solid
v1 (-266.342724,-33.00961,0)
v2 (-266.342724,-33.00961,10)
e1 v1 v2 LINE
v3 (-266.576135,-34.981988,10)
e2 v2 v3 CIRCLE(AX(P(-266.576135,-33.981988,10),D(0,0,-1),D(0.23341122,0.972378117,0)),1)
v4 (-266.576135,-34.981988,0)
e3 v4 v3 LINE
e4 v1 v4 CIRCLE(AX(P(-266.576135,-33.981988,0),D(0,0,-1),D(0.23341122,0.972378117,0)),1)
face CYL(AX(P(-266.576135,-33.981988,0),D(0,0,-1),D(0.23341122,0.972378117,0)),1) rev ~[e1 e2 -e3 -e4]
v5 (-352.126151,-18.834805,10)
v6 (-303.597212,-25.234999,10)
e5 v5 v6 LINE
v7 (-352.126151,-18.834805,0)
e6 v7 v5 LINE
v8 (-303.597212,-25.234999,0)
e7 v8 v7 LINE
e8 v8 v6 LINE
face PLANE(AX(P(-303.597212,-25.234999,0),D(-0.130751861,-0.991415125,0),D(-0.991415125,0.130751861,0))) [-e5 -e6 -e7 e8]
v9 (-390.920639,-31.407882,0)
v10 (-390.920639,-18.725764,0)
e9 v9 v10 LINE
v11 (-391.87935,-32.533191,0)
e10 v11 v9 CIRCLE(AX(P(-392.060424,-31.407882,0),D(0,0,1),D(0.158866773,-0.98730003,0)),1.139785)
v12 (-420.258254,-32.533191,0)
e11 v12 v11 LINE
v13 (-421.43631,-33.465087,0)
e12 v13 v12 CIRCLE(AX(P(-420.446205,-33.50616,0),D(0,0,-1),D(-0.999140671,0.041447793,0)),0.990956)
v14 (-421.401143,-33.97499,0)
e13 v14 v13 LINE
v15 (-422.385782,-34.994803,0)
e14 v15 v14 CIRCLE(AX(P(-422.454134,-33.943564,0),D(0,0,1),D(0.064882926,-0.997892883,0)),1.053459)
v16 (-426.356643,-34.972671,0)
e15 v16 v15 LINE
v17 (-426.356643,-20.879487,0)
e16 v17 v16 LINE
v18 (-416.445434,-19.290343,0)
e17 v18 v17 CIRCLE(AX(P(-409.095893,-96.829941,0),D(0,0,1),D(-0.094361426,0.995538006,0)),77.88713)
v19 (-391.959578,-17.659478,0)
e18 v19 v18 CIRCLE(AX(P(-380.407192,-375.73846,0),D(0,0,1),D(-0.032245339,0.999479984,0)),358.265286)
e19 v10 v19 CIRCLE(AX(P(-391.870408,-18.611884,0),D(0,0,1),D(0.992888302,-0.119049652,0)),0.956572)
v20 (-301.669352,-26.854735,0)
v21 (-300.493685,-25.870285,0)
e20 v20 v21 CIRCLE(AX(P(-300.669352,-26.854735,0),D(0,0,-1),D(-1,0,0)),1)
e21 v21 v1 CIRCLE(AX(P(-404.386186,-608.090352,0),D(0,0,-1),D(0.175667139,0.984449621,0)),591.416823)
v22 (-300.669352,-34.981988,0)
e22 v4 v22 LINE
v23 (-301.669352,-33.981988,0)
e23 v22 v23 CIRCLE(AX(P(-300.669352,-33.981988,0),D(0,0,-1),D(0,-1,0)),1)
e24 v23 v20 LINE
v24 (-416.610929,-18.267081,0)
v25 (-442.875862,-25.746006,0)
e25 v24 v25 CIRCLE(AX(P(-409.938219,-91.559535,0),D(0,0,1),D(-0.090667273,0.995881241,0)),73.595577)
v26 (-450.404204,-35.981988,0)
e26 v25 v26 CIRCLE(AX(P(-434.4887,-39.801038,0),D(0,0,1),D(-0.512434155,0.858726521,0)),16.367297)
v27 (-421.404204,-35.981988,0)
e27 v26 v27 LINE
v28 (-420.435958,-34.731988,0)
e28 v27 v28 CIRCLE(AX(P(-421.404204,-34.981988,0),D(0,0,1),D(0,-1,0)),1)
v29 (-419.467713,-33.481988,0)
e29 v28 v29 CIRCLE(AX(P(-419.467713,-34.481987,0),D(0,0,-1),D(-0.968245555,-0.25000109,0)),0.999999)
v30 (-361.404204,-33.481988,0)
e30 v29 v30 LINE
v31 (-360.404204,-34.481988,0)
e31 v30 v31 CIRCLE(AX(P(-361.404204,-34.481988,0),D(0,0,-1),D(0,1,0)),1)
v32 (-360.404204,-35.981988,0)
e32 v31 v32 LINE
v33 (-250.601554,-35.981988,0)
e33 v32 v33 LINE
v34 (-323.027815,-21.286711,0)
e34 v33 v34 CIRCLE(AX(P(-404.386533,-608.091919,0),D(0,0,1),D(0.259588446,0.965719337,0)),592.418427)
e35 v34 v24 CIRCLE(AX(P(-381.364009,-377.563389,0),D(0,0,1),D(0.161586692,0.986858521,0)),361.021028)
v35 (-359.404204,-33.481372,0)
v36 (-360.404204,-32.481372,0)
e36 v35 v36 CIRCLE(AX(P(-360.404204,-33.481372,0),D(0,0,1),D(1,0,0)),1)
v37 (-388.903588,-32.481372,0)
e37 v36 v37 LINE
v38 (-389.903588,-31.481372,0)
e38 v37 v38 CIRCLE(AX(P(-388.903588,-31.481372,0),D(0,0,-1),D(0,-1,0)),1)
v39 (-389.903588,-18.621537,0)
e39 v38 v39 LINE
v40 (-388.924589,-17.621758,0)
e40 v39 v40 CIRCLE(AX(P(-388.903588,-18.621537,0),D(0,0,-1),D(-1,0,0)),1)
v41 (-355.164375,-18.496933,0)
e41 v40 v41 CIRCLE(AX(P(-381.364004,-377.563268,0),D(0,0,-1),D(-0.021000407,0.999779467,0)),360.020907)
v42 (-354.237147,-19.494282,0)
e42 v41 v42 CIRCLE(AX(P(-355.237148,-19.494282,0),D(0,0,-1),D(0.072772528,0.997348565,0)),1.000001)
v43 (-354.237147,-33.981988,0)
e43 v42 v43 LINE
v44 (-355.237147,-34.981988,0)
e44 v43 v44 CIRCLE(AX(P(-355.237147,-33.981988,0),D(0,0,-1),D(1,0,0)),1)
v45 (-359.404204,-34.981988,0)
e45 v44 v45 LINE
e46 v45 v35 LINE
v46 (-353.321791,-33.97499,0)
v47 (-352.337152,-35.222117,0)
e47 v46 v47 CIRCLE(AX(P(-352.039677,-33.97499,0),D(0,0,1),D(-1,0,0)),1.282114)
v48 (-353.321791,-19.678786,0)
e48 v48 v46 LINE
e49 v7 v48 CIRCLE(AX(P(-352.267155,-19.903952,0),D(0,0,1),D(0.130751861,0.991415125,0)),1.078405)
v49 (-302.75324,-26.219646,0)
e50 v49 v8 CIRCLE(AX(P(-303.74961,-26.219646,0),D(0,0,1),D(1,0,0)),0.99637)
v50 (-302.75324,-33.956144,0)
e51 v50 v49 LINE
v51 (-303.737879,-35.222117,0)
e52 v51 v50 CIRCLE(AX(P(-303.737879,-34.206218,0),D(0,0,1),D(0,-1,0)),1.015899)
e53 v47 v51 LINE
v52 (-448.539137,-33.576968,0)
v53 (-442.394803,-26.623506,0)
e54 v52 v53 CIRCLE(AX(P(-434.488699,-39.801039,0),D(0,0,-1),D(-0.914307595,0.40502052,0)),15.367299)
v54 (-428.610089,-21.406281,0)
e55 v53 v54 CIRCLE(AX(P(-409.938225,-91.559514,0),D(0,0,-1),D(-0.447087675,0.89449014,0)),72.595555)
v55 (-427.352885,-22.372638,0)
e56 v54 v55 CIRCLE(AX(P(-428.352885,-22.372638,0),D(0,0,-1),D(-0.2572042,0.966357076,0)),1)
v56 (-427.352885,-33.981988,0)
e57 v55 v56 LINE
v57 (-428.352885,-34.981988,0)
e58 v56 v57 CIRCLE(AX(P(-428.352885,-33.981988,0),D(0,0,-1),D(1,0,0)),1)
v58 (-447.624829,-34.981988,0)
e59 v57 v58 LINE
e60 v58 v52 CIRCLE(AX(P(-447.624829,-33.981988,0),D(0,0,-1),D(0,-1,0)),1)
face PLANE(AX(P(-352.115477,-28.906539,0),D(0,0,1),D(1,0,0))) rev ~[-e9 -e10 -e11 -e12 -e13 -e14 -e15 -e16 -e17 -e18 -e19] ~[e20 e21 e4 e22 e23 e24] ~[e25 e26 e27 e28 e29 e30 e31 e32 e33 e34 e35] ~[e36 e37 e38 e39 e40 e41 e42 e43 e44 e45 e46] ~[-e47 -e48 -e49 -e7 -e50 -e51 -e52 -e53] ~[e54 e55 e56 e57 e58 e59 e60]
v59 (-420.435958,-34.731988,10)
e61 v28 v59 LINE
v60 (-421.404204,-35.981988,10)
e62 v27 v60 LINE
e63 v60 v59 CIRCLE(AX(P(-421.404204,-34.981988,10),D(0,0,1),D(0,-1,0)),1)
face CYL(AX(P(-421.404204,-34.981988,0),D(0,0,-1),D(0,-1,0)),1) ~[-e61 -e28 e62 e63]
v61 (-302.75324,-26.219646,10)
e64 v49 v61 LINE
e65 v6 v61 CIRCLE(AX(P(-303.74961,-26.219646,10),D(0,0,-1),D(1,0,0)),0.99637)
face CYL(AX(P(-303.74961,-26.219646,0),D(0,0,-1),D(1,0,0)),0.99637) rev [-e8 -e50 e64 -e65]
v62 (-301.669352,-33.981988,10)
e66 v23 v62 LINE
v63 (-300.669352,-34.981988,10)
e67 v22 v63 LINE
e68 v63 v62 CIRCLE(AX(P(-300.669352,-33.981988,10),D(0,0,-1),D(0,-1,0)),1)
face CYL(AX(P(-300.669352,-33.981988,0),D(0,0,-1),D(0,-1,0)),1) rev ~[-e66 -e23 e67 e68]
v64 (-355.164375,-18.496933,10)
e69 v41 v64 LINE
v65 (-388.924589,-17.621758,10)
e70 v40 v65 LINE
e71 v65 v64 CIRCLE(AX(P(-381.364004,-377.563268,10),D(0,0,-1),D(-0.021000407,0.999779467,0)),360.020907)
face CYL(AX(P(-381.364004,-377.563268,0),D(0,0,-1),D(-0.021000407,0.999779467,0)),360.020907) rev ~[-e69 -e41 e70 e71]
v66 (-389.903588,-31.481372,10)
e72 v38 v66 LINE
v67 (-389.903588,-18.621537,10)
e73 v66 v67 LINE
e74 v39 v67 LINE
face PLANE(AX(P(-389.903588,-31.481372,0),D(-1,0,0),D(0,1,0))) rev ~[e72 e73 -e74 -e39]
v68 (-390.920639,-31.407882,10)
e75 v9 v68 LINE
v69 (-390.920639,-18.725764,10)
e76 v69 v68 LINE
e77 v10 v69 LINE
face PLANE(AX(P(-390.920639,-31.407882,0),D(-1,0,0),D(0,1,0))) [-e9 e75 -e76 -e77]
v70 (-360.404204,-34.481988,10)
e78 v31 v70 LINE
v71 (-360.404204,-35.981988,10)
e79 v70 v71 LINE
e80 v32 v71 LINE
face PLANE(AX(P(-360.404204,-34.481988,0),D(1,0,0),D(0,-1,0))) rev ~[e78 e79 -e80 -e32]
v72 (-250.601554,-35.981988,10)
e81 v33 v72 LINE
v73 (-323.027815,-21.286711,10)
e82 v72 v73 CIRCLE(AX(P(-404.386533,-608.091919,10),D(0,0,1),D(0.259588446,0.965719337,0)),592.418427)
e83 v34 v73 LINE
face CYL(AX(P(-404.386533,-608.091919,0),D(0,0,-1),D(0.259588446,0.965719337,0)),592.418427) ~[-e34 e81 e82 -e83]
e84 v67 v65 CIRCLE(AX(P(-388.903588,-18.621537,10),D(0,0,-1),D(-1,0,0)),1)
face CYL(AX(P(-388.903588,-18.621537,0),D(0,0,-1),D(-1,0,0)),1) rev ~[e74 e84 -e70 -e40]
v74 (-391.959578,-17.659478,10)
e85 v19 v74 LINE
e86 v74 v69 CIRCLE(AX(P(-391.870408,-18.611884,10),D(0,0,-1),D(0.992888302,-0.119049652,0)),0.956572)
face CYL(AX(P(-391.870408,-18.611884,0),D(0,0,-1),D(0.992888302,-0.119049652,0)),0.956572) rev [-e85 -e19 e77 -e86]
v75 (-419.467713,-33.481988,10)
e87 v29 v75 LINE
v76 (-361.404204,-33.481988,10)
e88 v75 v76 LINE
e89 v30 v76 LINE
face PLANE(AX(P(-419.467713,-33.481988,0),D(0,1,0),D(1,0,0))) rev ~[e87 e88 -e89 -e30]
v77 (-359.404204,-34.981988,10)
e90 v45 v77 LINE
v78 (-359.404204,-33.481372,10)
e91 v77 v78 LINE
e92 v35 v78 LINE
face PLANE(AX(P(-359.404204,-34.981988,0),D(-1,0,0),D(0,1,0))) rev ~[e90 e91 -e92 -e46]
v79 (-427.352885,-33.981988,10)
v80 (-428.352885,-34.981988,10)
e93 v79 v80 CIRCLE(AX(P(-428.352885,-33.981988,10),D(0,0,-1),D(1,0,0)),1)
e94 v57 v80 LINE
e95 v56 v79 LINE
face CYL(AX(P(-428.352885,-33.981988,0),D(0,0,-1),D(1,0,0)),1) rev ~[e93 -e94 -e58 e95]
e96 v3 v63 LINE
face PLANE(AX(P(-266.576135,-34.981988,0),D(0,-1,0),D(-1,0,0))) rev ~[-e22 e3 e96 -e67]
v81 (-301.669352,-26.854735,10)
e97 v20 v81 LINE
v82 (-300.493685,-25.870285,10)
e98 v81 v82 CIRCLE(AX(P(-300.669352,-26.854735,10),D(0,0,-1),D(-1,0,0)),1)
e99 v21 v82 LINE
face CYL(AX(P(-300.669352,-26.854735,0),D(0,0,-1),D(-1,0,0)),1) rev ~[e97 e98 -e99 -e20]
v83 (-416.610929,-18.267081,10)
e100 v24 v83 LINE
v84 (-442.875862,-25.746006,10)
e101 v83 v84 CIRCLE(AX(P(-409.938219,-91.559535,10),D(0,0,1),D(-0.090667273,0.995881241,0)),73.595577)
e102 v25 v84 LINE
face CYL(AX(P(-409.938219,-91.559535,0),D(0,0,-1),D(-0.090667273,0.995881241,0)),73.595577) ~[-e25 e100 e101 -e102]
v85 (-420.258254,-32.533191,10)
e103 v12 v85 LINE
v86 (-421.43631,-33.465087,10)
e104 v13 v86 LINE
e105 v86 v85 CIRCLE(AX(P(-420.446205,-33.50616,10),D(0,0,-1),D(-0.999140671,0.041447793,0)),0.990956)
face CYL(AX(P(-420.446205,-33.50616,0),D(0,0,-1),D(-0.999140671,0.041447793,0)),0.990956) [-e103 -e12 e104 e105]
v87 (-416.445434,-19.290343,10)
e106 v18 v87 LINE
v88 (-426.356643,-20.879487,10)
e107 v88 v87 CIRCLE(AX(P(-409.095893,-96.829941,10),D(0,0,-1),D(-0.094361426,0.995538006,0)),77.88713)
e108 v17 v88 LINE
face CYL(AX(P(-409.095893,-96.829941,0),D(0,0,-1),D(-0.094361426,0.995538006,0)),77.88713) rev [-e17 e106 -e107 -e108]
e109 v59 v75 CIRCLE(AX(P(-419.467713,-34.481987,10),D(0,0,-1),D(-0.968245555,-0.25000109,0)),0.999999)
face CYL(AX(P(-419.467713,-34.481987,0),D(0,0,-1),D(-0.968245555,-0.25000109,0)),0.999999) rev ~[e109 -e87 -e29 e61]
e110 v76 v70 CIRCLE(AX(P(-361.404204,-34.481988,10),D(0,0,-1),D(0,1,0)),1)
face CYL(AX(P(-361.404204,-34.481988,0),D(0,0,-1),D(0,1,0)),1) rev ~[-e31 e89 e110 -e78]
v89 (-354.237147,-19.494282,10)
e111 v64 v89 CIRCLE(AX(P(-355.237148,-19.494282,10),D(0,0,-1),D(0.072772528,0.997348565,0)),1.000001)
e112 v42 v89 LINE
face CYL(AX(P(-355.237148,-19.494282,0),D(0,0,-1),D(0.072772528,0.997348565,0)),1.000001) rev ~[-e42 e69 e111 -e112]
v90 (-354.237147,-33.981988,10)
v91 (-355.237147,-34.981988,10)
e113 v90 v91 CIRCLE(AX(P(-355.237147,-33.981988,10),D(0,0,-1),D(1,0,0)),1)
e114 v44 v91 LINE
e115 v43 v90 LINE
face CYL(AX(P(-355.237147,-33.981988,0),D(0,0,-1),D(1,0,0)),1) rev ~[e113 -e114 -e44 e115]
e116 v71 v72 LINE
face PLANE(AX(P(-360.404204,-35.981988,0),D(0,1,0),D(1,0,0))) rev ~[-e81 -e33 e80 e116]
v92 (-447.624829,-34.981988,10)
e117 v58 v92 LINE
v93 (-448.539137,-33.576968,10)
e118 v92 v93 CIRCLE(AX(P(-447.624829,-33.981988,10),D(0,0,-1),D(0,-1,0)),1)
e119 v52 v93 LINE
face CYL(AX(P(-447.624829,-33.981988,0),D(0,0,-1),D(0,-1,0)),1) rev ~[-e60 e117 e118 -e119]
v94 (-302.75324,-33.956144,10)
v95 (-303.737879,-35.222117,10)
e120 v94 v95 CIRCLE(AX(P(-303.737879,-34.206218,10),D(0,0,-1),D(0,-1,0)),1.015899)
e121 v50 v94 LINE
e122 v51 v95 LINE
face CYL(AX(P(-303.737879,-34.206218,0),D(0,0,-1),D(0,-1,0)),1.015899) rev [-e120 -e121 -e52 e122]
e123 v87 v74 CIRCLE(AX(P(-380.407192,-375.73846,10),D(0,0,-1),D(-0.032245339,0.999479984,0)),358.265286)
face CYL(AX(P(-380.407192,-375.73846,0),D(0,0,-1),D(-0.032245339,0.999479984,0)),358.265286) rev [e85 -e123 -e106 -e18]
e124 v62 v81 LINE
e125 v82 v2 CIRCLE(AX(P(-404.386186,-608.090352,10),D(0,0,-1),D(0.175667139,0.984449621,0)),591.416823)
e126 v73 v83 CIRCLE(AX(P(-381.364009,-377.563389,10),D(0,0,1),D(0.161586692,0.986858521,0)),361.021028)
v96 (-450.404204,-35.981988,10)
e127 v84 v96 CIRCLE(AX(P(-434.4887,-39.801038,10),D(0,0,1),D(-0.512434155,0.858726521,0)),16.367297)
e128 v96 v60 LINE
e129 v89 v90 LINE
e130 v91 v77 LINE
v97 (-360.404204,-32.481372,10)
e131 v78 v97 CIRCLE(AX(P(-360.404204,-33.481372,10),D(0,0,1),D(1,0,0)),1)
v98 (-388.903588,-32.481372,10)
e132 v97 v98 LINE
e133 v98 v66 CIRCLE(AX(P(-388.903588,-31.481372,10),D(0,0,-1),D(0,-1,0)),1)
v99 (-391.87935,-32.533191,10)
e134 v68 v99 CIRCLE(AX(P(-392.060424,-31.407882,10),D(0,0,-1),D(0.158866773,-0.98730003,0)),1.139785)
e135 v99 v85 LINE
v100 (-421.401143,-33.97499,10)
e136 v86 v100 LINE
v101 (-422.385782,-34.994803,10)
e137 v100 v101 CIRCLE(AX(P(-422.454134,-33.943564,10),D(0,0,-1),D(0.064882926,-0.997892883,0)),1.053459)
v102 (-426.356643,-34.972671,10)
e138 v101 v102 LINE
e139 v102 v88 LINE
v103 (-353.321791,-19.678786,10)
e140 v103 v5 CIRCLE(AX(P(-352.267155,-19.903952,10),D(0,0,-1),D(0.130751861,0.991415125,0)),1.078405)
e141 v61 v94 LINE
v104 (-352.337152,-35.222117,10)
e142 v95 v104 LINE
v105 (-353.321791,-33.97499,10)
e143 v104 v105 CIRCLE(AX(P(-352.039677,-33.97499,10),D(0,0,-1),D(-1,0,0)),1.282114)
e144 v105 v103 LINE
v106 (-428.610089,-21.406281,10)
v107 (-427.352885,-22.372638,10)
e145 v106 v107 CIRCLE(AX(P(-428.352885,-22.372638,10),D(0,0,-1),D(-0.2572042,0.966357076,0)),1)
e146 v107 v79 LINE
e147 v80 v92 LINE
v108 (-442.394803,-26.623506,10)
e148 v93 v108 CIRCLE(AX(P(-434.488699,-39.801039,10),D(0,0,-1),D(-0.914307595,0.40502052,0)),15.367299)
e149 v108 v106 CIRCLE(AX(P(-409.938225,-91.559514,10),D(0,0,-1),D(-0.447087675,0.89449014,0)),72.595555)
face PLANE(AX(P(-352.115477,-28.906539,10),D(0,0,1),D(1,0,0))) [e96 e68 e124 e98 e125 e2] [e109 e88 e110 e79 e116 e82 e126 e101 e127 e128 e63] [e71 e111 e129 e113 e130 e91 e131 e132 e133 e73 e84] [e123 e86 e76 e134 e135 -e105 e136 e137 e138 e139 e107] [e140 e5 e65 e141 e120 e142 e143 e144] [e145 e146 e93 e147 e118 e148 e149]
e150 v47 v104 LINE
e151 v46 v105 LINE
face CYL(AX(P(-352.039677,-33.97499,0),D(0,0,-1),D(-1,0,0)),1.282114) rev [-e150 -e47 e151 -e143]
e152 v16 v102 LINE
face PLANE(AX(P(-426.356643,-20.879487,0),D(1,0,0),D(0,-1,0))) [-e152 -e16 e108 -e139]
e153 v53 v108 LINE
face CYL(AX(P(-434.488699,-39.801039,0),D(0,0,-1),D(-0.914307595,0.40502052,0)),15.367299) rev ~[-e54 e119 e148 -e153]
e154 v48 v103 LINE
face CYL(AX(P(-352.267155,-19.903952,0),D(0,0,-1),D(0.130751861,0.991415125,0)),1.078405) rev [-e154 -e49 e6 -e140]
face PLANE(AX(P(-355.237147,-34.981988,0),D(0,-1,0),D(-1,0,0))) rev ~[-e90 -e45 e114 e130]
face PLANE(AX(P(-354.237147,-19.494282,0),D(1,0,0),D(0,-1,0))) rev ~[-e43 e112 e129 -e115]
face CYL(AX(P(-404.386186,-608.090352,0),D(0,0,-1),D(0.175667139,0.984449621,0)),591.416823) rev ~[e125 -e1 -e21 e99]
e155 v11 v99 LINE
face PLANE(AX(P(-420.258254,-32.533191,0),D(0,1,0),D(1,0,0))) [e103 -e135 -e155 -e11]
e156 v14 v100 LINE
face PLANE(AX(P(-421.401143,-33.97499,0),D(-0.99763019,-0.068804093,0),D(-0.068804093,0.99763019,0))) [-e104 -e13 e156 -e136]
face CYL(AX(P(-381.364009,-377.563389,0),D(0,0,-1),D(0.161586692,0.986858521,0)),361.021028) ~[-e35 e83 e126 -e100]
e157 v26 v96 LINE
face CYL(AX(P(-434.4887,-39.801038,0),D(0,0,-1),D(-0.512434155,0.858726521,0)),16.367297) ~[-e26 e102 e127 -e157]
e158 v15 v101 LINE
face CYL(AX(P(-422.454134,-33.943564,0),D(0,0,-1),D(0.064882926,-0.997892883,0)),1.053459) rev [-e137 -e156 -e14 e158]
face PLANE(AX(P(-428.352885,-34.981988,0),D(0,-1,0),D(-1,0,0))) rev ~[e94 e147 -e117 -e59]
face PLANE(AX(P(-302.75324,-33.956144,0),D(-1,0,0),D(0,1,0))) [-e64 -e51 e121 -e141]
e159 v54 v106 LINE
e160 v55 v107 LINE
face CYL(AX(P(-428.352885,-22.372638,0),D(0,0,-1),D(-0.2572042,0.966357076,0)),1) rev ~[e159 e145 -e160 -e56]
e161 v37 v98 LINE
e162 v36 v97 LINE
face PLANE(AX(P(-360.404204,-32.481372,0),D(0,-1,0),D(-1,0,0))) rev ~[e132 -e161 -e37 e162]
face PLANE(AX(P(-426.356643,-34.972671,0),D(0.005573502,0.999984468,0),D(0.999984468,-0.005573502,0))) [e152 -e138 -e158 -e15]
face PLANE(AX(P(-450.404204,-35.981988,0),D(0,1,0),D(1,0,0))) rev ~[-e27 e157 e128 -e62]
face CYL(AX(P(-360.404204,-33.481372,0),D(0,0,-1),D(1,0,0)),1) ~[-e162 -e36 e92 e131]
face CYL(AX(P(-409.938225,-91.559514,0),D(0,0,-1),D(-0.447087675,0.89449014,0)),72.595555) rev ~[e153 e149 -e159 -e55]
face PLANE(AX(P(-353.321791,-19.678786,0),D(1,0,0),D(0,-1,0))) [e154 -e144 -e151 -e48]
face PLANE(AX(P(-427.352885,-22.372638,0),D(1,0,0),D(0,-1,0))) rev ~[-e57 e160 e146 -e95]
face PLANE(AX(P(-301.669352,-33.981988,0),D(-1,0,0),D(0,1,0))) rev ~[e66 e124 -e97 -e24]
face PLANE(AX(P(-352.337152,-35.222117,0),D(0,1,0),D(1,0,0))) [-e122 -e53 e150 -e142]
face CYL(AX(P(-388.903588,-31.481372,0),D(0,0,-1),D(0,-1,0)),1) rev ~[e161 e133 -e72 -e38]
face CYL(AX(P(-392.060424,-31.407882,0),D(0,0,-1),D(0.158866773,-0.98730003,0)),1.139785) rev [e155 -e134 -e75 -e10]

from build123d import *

# Parameters (mm, degrees)
F2_DEPTH = 10
F3_DEPTH = 25


# Not quite as in the source:
# - ends of sketch curves that miss each other by under 0.0002 mm in the source are joined


with BuildPart() as f2:
    # F0 (on Top) → F2 (new body)
    with BuildSketch(Plane.XY):
        with BuildLine():
            ThreePointArc((-442.8758620024, -25.746005996), (-447.6738706777, -30.1036318888), (-450.4042040181, -35.9819879957))
            Line((-450.4042040181, -35.9819879957), (-421.404204, -35.981988))
            ThreePointArc((-421.404204, -35.981988), (-420.6136345975, -35.5943604518), (-420.4359581532, -34.7319880396))
            ThreePointArc((-420.4359581532, -34.7319880396), (-420.2582824791, -33.869615647), (-419.467713, -33.481988))
            Line((-419.467713, -33.481988), (-361.404204, -33.481988))
            ThreePointArc((-361.404204, -33.481988), (-360.6970972188, -33.7748812188), (-360.404204, -34.481988))
            Line((-360.404204, -34.481988), (-360.404204, -35.981988))
            Line((-360.404204, -35.981988), (-250.601554, -35.981988))
            ThreePointArc((-250.601554, -35.981988), (-286.5853141243, -27.5038845491), (-323.0278148887, -21.2867111972))
            ThreePointArc((-323.0278148887, -21.2867111972), (-369.7210642755, -16.7301525977), (-416.6109290422, -18.2670805703))
            ThreePointArc((-416.6109290422, -18.2670805703), (-430.0933310666, -20.7776136638), (-442.8758620024, -25.746005996))
        make_face()
        with BuildLine():
            Line((-428.352885, -34.981988), (-447.624829, -34.981988))
            ThreePointArc((-447.624829, -34.981988), (-448.4629876769, -34.5274144683), (-448.539136854, -33.5769680647))
            ThreePointArc((-448.539136854, -33.5769680647), (-446.0043444552, -29.6253930638), (-442.3948028944, -26.6235058293))
            ThreePointArc((-442.3948028944, -26.6235058293), (-435.6351946925, -23.664150724), (-428.6100890003, -21.4062809989))
            ThreePointArc((-428.6100890003, -21.4062809989), (-427.7434606947, -21.5797937428), (-427.352885, -22.372638))
            Line((-427.352885, -22.372638), (-427.352885, -33.981988))
            ThreePointArc((-427.352885, -33.981988), (-427.6457782188, -34.6890947812), (-428.352885, -34.981988))
        make_face(mode=Mode.SUBTRACT)
        with BuildLine():
            Line((-266.576135, -34.981988), (-300.669352, -34.981988))
            ThreePointArc((-300.669352, -34.981988), (-301.3764587812, -34.6890947812), (-301.669352, -33.981988))
            Line((-301.669352, -33.981988), (-301.669352, -26.854735))
            ThreePointArc((-301.669352, -26.854735), (-301.3113539709, -26.0880320136), (-300.4936850613, -25.8702853433))
            ThreePointArc((-300.4936850613, -25.8702853433), (-283.3655471026, -29.1880608225), (-266.3427238914, -33.0096095475))
            ThreePointArc((-266.3427238914, -33.0096095475), (-265.5830644686, -34.0995078695), (-266.576135, -34.981988))
        make_face(mode=Mode.SUBTRACT)
        with BuildLine():
            Line((-355.237147, -34.981988), (-359.404204, -34.981988))
            Line((-359.404204, -34.981988), (-359.404204, -33.481372))
            ThreePointArc((-359.404204, -33.481372), (-359.6970972188, -32.7742652188), (-360.404204, -32.481372))
            Line((-360.404204, -32.481372), (-388.903588, -32.481372))
            ThreePointArc((-388.903588, -32.481372), (-389.6106947812, -32.1884787812), (-389.903588, -31.481372))
            Line((-389.903588, -31.481372), (-389.903588, -18.621537))
            ThreePointArc((-389.903588, -18.621537), (-389.618081173, -17.9218945872), (-388.9245889886, -17.6217575451))
            ThreePointArc((-388.9245889886, -17.6217575451), (-372.0342144327, -17.6632701711), (-355.1643750064, -18.4969330873))
            ThreePointArc((-355.1643750064, -18.4969330873), (-354.5047632307, -18.8133899275), (-354.237147, -19.494282))
            Line((-354.237147, -19.494282), (-354.237147, -33.981988))
            ThreePointArc((-354.237147, -33.981988), (-354.5300402188, -34.6890947812), (-355.237147, -34.981988))
        make_face(mode=Mode.SUBTRACT)
    extrude(amount=F2_DEPTH)

    # F1 (on face) → F3 (cut)
    with BuildSketch(Plane.XY):
        with BuildLine():
            Line((-426.3566434383, -20.8794865757), (-426.3566434383, -34.9726714194))
            Line((-426.3566434383, -34.9726714194), (-422.3857820034, -34.994803369))
            ThreePointArc((-422.3857820034, -34.994803369), (-421.6962703088, -34.6752877171), (-421.401143074, -33.9749902487))
            Line((-421.401143074, -33.9749902487), (-421.4363098145, -33.4650874138))
            ThreePointArc((-421.4363098145, -33.4650874138), (-421.0609978365, -32.7289703218), (-420.2582538128, -32.5331911445))
            Line((-420.2582538128, -32.5331911445), (-391.879349947, -32.5331911445))
            ThreePointArc((-391.879349947, -32.5331911445), (-391.1928137109, -32.1470446257), (-390.9206390381, -31.4078815281))
            Line((-390.9206390381, -31.4078815281), (-390.9206390381, -18.7257640064))
            ThreePointArc((-390.9206390381, -18.7257640064), (-391.1852808069, -17.9443289757), (-391.9595777988, -17.6594778895))
            ThreePointArc((-391.9595777988, -17.6594778895), (-404.2164737194, -18.2651978438), (-416.4454340935, -19.290342927))
            ThreePointArc((-416.4454340935, -19.290342927), (-421.4266657547, -19.925083731), (-426.3566434383, -20.8794865757))
        make_face()
        with BuildLine():
            Line((-353.3217906952, -19.678786397), (-353.3217906952, -33.9749902487))
            ThreePointArc((-353.3217906952, -33.9749902487), (-353.0459602673, -34.7694772845), (-352.3371517658, -35.2221168578))
            Line((-352.3371517658, -35.2221168578), (-303.7378787994, -35.2221168578))
            ThreePointArc((-303.7378787994, -35.2221168578), (-302.935974646, -34.8299169031), (-302.7532398701, -33.9561440051))
            Line((-302.7532398701, -33.9561440051), (-302.7532398701, -26.2196455151))
            ThreePointArc((-302.7532398701, -26.2196455151), (-302.9931053965, -25.5712210446), (-303.5972118378, -25.2349991351))
            Line((-303.5972118378, -25.2349991351), (-352.1261513233, -18.8348051161))
            ThreePointArc((-352.1261513233, -18.8348051161), (-352.8890528033, -19.0229300334), (-353.3217906952, -19.678786397))
        make_face()
    extrude(amount=F3_DEPTH, mode=Mode.SUBTRACT)


solid = f2.part
